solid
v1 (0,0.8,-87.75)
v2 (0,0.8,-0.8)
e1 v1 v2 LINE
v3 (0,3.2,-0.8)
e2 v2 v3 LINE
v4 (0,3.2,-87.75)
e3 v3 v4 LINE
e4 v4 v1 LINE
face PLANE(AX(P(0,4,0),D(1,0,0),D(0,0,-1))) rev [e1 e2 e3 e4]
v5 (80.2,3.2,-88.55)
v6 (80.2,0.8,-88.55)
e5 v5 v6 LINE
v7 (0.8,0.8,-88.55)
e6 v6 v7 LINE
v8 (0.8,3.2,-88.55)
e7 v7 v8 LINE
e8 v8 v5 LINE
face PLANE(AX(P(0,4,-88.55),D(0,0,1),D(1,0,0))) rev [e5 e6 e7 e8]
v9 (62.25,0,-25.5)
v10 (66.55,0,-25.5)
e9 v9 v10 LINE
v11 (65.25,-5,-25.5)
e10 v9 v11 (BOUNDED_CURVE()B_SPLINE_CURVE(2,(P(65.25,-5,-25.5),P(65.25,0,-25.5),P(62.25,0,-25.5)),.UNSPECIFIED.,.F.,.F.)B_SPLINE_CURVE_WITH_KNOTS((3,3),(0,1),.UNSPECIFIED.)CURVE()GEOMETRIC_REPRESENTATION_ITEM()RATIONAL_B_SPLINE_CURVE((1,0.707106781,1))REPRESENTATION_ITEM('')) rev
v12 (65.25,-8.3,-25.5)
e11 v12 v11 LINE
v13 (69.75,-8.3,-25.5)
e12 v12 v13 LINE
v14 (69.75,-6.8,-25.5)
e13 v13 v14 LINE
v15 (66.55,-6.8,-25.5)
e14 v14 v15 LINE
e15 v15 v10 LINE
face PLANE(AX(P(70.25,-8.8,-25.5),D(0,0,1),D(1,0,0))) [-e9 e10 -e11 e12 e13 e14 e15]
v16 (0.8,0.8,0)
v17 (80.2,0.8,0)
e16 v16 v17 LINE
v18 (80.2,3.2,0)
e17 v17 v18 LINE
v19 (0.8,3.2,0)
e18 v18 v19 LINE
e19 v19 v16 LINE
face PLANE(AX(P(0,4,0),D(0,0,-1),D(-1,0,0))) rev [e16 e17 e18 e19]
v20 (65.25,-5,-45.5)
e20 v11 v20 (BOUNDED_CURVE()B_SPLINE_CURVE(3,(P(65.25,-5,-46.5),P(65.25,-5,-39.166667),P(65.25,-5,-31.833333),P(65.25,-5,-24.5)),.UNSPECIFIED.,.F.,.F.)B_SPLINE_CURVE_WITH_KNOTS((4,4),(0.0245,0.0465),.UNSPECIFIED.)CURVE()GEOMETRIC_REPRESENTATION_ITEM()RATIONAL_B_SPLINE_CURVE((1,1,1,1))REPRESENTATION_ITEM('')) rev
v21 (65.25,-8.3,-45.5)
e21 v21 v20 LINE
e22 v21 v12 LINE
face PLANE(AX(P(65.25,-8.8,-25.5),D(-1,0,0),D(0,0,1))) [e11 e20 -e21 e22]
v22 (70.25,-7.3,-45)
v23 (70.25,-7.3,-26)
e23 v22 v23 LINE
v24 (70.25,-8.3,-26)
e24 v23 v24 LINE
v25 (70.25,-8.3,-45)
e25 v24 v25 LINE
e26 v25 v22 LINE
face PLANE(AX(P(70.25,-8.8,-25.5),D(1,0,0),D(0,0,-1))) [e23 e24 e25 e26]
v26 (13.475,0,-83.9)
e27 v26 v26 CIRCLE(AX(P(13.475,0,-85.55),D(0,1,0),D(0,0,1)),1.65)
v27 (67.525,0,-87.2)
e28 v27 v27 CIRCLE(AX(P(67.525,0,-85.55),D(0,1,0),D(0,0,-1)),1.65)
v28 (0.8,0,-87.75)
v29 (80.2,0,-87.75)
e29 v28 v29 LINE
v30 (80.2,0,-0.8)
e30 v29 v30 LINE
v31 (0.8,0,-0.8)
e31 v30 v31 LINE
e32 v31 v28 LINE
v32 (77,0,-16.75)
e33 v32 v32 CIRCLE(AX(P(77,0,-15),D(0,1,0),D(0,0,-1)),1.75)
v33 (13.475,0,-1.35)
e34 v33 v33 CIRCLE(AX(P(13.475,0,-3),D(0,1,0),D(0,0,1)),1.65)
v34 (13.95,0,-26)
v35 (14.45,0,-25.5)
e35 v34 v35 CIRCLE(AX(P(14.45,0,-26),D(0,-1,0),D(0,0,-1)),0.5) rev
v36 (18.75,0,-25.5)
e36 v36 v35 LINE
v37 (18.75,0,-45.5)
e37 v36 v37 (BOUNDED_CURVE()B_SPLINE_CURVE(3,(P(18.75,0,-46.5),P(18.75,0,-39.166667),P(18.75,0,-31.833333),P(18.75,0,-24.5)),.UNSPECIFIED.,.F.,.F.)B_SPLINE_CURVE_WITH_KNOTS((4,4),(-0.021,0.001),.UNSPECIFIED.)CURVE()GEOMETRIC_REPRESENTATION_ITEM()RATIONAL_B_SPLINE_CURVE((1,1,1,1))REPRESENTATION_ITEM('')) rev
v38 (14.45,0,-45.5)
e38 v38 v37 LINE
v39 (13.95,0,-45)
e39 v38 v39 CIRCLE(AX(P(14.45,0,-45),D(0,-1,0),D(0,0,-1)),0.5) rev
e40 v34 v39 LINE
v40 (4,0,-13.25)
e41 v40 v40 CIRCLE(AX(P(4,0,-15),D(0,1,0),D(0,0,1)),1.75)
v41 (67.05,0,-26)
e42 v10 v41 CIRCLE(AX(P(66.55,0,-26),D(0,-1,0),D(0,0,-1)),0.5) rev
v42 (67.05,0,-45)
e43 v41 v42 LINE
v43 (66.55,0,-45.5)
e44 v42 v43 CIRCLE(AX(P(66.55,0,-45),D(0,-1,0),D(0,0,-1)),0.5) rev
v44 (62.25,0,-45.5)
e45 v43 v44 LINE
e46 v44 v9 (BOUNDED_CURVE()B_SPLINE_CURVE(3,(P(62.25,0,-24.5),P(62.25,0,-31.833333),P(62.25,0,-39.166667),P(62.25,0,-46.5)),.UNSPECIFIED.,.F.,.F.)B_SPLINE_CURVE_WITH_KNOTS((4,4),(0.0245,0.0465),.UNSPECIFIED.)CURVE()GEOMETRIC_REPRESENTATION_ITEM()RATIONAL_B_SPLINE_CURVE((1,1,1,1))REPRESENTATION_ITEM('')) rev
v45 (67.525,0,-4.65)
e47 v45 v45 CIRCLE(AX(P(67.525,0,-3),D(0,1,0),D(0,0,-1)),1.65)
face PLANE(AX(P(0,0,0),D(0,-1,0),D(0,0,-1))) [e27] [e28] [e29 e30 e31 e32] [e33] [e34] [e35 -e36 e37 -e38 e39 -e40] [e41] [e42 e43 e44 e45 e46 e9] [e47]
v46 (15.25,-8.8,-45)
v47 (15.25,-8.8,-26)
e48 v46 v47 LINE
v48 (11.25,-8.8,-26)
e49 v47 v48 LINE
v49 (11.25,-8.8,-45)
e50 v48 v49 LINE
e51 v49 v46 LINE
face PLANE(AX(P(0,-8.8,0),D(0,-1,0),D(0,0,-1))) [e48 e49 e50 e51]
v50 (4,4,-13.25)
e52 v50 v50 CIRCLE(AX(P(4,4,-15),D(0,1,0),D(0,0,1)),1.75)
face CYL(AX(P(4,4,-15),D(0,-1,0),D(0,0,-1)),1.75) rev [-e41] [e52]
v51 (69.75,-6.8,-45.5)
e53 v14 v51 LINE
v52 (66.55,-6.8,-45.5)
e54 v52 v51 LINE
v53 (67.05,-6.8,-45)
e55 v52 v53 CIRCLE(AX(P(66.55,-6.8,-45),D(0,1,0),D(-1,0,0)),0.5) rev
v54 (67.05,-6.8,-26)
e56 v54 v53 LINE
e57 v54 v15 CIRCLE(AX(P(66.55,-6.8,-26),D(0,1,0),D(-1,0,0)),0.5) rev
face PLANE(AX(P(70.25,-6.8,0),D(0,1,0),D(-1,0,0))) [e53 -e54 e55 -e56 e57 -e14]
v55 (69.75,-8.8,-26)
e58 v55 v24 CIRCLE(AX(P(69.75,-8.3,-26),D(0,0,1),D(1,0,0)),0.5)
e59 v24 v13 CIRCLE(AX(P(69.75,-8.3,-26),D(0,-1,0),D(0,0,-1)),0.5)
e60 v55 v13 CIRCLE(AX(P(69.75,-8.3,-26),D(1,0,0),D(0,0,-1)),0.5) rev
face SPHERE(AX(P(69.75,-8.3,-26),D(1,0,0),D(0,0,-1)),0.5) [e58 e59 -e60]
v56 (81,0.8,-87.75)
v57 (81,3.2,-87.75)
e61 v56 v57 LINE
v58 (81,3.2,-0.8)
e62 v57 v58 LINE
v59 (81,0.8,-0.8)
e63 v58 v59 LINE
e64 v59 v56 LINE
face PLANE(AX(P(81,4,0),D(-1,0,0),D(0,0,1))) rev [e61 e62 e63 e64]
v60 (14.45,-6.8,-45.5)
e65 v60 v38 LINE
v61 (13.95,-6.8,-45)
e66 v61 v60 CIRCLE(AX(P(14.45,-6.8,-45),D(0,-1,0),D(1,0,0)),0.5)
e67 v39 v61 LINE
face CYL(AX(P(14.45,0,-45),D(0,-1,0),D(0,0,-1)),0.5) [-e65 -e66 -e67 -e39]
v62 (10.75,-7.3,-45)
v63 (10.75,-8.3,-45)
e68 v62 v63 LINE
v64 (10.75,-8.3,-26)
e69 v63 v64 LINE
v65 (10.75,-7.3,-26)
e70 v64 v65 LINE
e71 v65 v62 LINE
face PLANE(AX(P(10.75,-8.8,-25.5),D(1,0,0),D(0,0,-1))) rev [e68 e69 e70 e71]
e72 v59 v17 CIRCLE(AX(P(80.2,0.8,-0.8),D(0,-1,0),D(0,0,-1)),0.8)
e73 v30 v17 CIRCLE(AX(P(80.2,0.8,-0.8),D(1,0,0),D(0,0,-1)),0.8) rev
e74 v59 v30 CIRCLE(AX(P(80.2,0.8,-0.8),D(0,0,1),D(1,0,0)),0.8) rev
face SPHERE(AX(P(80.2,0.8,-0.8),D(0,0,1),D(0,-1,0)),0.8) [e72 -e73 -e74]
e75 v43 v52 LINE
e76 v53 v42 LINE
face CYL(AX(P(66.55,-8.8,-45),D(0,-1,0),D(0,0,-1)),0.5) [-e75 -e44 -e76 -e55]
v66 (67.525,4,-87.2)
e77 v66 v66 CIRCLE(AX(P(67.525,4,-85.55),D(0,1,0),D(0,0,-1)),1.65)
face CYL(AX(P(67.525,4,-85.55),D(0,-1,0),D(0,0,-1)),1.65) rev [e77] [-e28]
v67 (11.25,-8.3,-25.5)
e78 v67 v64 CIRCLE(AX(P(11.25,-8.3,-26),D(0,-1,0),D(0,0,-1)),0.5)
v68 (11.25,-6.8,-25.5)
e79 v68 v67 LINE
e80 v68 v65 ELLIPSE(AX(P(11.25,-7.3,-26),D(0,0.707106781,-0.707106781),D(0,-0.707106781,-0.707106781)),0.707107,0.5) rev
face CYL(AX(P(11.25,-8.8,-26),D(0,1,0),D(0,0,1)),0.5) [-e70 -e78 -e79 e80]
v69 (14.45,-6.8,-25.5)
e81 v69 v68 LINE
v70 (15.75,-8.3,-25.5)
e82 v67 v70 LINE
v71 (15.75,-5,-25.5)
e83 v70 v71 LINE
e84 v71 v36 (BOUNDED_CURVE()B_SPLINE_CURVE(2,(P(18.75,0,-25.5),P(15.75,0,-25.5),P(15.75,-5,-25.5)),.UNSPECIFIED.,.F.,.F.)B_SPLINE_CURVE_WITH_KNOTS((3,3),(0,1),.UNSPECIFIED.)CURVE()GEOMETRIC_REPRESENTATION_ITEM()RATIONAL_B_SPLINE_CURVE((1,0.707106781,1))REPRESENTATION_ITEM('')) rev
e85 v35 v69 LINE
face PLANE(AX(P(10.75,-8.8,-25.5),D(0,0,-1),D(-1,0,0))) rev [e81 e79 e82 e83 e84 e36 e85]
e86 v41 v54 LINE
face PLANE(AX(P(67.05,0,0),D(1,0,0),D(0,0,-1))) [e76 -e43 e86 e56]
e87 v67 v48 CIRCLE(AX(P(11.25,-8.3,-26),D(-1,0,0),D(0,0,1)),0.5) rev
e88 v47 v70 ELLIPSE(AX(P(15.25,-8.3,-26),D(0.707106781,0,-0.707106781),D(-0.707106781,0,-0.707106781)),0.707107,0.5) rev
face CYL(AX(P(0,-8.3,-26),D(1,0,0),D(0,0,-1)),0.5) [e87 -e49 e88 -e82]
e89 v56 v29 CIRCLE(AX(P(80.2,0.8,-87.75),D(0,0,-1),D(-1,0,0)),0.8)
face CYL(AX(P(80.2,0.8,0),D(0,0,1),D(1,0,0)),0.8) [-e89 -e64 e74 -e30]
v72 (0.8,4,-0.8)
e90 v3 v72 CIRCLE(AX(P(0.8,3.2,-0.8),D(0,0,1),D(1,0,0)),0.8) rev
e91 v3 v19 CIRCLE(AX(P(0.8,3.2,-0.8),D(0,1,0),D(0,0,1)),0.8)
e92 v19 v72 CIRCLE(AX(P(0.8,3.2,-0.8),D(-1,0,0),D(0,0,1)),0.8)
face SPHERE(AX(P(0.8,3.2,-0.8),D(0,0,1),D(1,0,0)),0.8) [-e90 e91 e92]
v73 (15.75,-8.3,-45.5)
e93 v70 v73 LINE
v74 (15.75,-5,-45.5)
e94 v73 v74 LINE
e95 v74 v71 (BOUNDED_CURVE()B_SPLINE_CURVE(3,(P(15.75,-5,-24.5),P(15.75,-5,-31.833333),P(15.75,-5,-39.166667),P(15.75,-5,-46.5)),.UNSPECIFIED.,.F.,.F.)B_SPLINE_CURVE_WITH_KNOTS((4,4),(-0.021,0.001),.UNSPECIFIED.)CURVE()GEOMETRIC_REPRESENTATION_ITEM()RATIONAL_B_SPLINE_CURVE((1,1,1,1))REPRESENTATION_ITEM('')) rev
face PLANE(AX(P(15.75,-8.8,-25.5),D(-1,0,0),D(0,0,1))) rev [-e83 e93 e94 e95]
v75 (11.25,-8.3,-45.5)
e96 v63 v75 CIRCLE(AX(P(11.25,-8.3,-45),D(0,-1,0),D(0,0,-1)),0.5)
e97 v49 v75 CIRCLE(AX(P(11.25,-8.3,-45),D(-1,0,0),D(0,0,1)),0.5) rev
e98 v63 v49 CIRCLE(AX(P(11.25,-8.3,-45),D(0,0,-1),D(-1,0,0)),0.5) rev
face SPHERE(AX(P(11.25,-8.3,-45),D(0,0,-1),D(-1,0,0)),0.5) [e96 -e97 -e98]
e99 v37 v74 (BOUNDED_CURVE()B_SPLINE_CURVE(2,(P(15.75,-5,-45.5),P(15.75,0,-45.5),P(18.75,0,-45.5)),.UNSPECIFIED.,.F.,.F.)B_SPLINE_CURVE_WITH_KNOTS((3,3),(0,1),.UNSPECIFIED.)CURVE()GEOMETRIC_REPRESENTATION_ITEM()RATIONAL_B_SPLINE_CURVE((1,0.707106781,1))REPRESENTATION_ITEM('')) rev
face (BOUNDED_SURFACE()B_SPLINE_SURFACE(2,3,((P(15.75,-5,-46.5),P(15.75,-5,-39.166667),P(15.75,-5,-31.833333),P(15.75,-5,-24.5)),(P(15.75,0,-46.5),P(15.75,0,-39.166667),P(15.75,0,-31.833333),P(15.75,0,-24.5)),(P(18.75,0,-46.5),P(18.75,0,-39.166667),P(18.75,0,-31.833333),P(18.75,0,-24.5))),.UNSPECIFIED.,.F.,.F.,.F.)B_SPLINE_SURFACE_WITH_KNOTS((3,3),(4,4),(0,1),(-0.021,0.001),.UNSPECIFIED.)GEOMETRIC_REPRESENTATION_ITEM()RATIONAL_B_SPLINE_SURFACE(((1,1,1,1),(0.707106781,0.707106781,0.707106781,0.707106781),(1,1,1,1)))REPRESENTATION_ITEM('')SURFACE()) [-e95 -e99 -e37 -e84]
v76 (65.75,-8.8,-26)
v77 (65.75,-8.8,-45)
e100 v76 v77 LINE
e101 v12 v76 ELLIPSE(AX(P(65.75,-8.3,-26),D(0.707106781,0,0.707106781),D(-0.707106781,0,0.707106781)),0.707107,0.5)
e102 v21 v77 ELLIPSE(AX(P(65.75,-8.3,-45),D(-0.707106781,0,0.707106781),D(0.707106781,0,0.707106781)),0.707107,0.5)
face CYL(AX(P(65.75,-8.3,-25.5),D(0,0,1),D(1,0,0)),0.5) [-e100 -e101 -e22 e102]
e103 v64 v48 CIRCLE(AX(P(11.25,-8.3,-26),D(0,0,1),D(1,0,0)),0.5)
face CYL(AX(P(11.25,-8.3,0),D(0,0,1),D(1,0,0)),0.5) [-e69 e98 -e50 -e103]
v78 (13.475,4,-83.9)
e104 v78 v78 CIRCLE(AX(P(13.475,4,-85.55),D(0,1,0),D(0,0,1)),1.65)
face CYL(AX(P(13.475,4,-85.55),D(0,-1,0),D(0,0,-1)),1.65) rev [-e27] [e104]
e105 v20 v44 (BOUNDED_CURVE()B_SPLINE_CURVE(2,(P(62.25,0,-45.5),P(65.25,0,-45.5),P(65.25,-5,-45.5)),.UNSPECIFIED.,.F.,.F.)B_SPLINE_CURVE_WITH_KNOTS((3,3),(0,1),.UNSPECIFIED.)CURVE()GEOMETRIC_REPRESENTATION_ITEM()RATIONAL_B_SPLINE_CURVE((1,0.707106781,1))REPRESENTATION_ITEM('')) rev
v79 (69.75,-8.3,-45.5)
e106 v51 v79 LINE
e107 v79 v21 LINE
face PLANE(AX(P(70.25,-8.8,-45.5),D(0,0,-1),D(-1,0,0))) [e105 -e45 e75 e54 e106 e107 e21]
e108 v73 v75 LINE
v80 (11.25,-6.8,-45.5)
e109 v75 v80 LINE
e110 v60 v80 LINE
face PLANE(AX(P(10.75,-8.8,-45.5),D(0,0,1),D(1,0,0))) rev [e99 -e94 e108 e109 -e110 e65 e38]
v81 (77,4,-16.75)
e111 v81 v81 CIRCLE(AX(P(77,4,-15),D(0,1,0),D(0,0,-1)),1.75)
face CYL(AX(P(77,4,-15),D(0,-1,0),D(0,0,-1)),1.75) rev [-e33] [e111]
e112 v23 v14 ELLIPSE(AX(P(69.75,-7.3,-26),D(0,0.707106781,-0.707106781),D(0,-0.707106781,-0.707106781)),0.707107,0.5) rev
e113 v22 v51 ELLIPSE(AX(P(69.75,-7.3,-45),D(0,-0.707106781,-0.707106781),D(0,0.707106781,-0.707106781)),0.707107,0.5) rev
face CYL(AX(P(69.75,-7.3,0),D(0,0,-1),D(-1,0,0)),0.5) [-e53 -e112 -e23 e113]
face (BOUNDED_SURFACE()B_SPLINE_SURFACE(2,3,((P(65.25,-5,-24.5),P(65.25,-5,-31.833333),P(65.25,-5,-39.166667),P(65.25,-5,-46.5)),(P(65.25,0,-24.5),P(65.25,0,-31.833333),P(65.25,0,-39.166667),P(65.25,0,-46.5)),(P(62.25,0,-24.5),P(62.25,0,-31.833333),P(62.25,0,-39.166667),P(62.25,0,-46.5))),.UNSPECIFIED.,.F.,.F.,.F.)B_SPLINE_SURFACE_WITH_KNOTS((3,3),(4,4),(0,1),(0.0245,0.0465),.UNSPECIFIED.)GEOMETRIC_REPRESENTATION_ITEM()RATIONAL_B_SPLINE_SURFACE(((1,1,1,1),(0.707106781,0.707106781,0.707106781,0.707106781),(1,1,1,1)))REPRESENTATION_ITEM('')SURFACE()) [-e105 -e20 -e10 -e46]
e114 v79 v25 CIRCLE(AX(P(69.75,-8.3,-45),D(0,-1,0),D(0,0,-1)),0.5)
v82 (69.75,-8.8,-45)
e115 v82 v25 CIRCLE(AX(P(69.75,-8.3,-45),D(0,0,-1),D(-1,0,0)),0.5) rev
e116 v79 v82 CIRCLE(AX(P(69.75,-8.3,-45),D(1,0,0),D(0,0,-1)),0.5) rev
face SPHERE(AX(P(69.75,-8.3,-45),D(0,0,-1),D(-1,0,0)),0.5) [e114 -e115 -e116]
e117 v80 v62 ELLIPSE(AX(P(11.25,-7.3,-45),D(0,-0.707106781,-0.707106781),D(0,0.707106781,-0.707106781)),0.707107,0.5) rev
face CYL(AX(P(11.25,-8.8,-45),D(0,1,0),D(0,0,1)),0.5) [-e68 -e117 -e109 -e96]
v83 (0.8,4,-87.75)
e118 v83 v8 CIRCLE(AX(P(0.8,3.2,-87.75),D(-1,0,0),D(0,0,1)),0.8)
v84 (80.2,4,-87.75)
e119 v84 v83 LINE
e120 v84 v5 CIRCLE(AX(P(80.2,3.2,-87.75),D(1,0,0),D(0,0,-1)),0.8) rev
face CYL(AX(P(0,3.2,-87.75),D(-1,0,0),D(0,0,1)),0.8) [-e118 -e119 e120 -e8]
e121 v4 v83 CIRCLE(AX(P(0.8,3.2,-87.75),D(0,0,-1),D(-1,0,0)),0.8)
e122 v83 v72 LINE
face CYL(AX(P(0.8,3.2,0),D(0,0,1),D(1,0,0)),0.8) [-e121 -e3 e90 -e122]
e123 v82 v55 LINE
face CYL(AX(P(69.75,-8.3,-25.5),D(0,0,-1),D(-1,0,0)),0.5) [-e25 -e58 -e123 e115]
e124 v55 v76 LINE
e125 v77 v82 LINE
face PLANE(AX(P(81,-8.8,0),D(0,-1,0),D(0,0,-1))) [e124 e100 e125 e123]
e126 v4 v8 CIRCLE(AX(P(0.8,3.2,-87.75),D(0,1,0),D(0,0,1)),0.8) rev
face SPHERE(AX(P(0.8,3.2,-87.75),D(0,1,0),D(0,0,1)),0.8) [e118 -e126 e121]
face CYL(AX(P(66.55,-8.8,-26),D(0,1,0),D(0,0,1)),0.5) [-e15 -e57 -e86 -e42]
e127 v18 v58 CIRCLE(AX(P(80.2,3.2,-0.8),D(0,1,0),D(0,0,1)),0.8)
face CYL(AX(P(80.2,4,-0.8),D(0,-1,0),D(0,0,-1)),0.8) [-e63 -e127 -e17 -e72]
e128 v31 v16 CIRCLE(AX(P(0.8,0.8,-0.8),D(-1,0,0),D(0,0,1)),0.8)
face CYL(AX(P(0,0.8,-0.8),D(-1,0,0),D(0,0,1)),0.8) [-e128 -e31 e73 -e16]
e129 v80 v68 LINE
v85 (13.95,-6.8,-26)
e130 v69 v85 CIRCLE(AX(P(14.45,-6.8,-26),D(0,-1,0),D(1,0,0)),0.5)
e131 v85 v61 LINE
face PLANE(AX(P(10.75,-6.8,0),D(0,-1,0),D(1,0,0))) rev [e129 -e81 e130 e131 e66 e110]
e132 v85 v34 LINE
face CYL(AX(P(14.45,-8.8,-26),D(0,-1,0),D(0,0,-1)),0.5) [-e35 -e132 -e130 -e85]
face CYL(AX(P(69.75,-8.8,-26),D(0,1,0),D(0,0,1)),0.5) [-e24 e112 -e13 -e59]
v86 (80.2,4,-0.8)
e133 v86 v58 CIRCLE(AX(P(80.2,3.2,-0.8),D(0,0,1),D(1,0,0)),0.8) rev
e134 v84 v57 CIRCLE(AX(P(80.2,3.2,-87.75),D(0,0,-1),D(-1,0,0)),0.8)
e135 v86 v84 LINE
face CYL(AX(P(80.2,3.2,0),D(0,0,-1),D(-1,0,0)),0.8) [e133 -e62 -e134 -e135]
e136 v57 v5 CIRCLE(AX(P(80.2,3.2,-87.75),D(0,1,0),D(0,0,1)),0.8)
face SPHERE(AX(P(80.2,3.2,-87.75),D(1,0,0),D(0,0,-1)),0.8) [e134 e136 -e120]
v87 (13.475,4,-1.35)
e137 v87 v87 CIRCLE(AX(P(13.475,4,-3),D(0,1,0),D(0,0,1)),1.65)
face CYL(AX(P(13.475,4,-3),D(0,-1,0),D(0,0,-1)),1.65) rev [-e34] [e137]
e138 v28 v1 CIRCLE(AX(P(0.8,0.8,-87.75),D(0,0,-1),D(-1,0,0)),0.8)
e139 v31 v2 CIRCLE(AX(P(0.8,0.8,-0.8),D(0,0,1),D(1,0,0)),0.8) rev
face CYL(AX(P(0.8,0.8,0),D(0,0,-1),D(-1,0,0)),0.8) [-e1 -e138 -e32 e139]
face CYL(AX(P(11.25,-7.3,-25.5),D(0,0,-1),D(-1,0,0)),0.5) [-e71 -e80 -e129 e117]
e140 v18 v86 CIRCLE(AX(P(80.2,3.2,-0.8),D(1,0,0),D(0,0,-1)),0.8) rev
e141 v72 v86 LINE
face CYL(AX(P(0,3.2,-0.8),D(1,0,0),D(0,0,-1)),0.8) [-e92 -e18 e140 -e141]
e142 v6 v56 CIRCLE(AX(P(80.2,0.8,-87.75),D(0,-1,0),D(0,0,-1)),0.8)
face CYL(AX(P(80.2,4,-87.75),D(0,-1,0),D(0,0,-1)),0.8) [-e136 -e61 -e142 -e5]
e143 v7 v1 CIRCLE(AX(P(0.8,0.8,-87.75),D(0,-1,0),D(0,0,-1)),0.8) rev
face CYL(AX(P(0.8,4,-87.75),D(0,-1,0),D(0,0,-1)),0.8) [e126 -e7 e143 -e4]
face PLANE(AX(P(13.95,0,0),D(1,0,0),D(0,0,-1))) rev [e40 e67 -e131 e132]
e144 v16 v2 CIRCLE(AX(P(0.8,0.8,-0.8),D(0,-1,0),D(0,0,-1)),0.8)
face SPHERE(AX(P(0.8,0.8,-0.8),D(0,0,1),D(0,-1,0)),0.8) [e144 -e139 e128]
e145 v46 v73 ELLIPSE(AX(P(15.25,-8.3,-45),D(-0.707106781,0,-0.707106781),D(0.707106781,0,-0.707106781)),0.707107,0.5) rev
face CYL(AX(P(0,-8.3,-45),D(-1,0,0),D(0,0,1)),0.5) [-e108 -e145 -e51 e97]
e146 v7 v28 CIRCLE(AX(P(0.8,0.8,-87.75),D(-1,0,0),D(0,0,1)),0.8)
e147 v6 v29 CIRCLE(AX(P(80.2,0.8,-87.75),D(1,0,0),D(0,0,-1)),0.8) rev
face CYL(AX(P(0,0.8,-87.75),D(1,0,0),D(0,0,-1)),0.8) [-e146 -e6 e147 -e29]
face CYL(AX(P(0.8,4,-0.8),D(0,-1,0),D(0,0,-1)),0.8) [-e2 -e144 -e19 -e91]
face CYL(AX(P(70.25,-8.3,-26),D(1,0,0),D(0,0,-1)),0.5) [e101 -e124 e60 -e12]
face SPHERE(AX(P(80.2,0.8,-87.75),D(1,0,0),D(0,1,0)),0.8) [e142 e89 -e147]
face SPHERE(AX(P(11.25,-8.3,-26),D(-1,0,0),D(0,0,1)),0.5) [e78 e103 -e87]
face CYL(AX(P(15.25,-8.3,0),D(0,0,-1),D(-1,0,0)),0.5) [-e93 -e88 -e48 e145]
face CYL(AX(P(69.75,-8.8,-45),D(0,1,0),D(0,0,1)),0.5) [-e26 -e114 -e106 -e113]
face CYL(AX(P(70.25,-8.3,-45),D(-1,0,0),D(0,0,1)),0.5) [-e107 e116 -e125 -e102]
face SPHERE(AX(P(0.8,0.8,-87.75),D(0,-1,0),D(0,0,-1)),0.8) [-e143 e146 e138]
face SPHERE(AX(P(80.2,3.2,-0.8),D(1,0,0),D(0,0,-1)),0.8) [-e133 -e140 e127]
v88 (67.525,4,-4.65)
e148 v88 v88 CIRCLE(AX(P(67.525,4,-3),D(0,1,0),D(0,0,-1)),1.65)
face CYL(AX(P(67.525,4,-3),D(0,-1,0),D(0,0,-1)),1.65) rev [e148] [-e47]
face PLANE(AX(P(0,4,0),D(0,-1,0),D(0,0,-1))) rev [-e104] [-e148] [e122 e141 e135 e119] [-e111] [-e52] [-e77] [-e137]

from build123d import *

# Parameters (mm, degrees)
SKETCH1_W                 = 81
SKETCH1_H                 = 88.55
SKETCH1_R                 = 1.75
SKETCH1_R_2               = 1.65
BOSS_EXTRUDE1_DEPTH       = 4
FILLET3_R                 = 0.8
SKETCH2_W                 = 5
SKETCH2_H                 = 20
BOSS_EXTRUDE2_DEPTH       = 8.8
SKETCH5_W                 = 3.2
SKETCH5_H                 = 6.8
CUT_EXTRUDE1_DEPTH        = 94.320362194
FILLET1_SIZE              = 3
FILLET1_SIZE_2            = 5
FILLET2_R                 = 0.5
FILLET1_OF_MIRROR1_SIZE   = 3
FILLET1_OF_MIRROR1_SIZE_2 = 5
FILLET2_OF_MIRROR1_R      = 0.5


with BuildPart() as part:
    # Sketch1 → Boss-Extrude1 (new body)
    with BuildSketch(Plane(origin=(0, 0, 0), x_dir=(1, 0, 0), z_dir=(0, 1, 0))):
        with Locations((40.5, 44.275)):
            Rectangle(SKETCH1_W, SKETCH1_H)
        with Locations(Location((4, 15, 0), (0, 0, 270))):
            Circle(SKETCH1_R, mode=Mode.SUBTRACT)
        with Locations(Location((13.475, 3, 0), (0, 0, 270))):
            Circle(SKETCH1_R_2, mode=Mode.SUBTRACT)
        with Locations(Location((13.475, 85.55, 0), (0, 0, 270))):
            Circle(SKETCH1_R_2, mode=Mode.SUBTRACT)
        with Locations(Location((77, 15, 0), (0, 0, 90))):
            Circle(SKETCH1_R, mode=Mode.SUBTRACT)
        with Locations(Location((67.525, 3, 0), (0, 0, 90))):
            Circle(SKETCH1_R_2, mode=Mode.SUBTRACT)
        with Locations(Location((67.525, 85.55, 0), (0, 0, 90))):
            Circle(SKETCH1_R_2, mode=Mode.SUBTRACT)
    extrude(amount=BOSS_EXTRUDE1_DEPTH)

    # Fillet3
    fillet3_edges = [part.edges().sort_by_distance(p)[0] for p in [
        (81, 4, -44.275),
        (40.5, 4, -88.55),
        (0, 4, -44.275),
        (40.5, 0, -88.55),
        (81, 0, -44.275),
        (40.5, 0, 0),
        (0, 0, -44.275),
        (0, 2, -88.55),
        (81, 2, -88.55),
        (81, 2, 0),
        (0, 2, 0),
        (40.5, 4, 0),
    ]]
    fillet(fillet3_edges, radius=FILLET3_R)

    # Sketch2 → Boss-Extrude2 (add)
    with BuildSketch(Plane.XZ):
        with Locations((13.25, -35.5)):
            Rectangle(SKETCH2_W, SKETCH2_H)
    boss_extrude2 = extrude(amount=BOSS_EXTRUDE2_DEPTH)

    # Sketch5 → Cut-Extrude1 (cut, through all)
    with BuildSketch(Plane(origin=(0, 0, -45.5), x_dir=(-1, 0, 0), z_dir=(0, 0, -1))):
        with Locations((-12.35, -3.4)):
            Rectangle(SKETCH5_W, SKETCH5_H)
    cut_extrude1 = extrude(amount=-CUT_EXTRUDE1_DEPTH, mode=Mode.SUBTRACT)

    # Fillet1
    # an asymmetric fillet: 5, 3 mm, written as the material it adds along each edge
    with BuildSketch(Plane(origin=(15.75, 0, -25.5), x_dir=(1, 0, 0), z_dir=(0, 0, -1))) as fillet1_piece_1:
        with BuildLine():
            Bezier((FILLET1_SIZE, 0), (0, 0), (0, FILLET1_SIZE_2), weights=[1, 0.707106781, 1])
            Line((0, FILLET1_SIZE_2), (0, 0))
            Line((0, 0), (FILLET1_SIZE, 0))
        make_face()
    extrude(amount=20)

    # Fillet2
    fillet2_edges = [part.edges().sort_by_distance(p)[0] for p in [
        (13.25, -8.8, -25.5),
        (13.25, -8.8, -45.5),
        (10.75, -7.8, -25.5),
        (10.75, -7.8, -45.5),
        (10.75, -6.8, -35.5),
        (13.95, -3.4, -45.5),
        (13.95, -3.4, -25.5),
        (10.75, -8.8, -35.5),
        (15.75, -8.8, -35.5),
    ]]
    fillet(fillet2_edges, radius=FILLET2_R)

    # Mirror1: Boss-Extrude2, Cut-Extrude1 across plane
    add(boss_extrude2.mirror(Plane.ZY.offset(-40.5)))
    add(cut_extrude1.mirror(Plane.ZY.offset(-40.5)), mode=Mode.SUBTRACT)

    # Fillet1 of Mirror1
    # an asymmetric fillet: 5, 3 mm, written as the material it adds along each edge
    with BuildSketch(Plane(origin=(65.25, 0, -25.5), x_dir=(-1, 0, 0), z_dir=(0, 0, -1))) as fillet1_of_mirror1_piece_1:
        with BuildLine():
            Bezier((FILLET1_OF_MIRROR1_SIZE, 0), (0, 0), (0, -FILLET1_OF_MIRROR1_SIZE_2), weights=[1, 0.707106781, 1])
            Line((0, -FILLET1_OF_MIRROR1_SIZE_2), (0, 0))
            Line((0, 0), (FILLET1_OF_MIRROR1_SIZE, 0))
        make_face()
    extrude(amount=20)

    # Fillet2 of Mirror1
    fillet2_of_mirror1_edges = [part.edges().sort_by_distance(p)[0] for p in [
        (67.75, -8.8, -25.5),
        (67.75, -8.8, -45.5),
        (70.25, -7.8, -25.5),
        (70.25, -7.8, -45.5),
        (70.25, -6.8, -35.5),
        (67.05, -3.4, -45.5),
        (67.05, -3.4, -25.5),
        (70.25, -8.8, -35.5),
        (65.25, -8.8, -35.5),
    ]]
    fillet(fillet2_of_mirror1_edges, radius=FILLET2_OF_MIRROR1_R)


solid = part.part
